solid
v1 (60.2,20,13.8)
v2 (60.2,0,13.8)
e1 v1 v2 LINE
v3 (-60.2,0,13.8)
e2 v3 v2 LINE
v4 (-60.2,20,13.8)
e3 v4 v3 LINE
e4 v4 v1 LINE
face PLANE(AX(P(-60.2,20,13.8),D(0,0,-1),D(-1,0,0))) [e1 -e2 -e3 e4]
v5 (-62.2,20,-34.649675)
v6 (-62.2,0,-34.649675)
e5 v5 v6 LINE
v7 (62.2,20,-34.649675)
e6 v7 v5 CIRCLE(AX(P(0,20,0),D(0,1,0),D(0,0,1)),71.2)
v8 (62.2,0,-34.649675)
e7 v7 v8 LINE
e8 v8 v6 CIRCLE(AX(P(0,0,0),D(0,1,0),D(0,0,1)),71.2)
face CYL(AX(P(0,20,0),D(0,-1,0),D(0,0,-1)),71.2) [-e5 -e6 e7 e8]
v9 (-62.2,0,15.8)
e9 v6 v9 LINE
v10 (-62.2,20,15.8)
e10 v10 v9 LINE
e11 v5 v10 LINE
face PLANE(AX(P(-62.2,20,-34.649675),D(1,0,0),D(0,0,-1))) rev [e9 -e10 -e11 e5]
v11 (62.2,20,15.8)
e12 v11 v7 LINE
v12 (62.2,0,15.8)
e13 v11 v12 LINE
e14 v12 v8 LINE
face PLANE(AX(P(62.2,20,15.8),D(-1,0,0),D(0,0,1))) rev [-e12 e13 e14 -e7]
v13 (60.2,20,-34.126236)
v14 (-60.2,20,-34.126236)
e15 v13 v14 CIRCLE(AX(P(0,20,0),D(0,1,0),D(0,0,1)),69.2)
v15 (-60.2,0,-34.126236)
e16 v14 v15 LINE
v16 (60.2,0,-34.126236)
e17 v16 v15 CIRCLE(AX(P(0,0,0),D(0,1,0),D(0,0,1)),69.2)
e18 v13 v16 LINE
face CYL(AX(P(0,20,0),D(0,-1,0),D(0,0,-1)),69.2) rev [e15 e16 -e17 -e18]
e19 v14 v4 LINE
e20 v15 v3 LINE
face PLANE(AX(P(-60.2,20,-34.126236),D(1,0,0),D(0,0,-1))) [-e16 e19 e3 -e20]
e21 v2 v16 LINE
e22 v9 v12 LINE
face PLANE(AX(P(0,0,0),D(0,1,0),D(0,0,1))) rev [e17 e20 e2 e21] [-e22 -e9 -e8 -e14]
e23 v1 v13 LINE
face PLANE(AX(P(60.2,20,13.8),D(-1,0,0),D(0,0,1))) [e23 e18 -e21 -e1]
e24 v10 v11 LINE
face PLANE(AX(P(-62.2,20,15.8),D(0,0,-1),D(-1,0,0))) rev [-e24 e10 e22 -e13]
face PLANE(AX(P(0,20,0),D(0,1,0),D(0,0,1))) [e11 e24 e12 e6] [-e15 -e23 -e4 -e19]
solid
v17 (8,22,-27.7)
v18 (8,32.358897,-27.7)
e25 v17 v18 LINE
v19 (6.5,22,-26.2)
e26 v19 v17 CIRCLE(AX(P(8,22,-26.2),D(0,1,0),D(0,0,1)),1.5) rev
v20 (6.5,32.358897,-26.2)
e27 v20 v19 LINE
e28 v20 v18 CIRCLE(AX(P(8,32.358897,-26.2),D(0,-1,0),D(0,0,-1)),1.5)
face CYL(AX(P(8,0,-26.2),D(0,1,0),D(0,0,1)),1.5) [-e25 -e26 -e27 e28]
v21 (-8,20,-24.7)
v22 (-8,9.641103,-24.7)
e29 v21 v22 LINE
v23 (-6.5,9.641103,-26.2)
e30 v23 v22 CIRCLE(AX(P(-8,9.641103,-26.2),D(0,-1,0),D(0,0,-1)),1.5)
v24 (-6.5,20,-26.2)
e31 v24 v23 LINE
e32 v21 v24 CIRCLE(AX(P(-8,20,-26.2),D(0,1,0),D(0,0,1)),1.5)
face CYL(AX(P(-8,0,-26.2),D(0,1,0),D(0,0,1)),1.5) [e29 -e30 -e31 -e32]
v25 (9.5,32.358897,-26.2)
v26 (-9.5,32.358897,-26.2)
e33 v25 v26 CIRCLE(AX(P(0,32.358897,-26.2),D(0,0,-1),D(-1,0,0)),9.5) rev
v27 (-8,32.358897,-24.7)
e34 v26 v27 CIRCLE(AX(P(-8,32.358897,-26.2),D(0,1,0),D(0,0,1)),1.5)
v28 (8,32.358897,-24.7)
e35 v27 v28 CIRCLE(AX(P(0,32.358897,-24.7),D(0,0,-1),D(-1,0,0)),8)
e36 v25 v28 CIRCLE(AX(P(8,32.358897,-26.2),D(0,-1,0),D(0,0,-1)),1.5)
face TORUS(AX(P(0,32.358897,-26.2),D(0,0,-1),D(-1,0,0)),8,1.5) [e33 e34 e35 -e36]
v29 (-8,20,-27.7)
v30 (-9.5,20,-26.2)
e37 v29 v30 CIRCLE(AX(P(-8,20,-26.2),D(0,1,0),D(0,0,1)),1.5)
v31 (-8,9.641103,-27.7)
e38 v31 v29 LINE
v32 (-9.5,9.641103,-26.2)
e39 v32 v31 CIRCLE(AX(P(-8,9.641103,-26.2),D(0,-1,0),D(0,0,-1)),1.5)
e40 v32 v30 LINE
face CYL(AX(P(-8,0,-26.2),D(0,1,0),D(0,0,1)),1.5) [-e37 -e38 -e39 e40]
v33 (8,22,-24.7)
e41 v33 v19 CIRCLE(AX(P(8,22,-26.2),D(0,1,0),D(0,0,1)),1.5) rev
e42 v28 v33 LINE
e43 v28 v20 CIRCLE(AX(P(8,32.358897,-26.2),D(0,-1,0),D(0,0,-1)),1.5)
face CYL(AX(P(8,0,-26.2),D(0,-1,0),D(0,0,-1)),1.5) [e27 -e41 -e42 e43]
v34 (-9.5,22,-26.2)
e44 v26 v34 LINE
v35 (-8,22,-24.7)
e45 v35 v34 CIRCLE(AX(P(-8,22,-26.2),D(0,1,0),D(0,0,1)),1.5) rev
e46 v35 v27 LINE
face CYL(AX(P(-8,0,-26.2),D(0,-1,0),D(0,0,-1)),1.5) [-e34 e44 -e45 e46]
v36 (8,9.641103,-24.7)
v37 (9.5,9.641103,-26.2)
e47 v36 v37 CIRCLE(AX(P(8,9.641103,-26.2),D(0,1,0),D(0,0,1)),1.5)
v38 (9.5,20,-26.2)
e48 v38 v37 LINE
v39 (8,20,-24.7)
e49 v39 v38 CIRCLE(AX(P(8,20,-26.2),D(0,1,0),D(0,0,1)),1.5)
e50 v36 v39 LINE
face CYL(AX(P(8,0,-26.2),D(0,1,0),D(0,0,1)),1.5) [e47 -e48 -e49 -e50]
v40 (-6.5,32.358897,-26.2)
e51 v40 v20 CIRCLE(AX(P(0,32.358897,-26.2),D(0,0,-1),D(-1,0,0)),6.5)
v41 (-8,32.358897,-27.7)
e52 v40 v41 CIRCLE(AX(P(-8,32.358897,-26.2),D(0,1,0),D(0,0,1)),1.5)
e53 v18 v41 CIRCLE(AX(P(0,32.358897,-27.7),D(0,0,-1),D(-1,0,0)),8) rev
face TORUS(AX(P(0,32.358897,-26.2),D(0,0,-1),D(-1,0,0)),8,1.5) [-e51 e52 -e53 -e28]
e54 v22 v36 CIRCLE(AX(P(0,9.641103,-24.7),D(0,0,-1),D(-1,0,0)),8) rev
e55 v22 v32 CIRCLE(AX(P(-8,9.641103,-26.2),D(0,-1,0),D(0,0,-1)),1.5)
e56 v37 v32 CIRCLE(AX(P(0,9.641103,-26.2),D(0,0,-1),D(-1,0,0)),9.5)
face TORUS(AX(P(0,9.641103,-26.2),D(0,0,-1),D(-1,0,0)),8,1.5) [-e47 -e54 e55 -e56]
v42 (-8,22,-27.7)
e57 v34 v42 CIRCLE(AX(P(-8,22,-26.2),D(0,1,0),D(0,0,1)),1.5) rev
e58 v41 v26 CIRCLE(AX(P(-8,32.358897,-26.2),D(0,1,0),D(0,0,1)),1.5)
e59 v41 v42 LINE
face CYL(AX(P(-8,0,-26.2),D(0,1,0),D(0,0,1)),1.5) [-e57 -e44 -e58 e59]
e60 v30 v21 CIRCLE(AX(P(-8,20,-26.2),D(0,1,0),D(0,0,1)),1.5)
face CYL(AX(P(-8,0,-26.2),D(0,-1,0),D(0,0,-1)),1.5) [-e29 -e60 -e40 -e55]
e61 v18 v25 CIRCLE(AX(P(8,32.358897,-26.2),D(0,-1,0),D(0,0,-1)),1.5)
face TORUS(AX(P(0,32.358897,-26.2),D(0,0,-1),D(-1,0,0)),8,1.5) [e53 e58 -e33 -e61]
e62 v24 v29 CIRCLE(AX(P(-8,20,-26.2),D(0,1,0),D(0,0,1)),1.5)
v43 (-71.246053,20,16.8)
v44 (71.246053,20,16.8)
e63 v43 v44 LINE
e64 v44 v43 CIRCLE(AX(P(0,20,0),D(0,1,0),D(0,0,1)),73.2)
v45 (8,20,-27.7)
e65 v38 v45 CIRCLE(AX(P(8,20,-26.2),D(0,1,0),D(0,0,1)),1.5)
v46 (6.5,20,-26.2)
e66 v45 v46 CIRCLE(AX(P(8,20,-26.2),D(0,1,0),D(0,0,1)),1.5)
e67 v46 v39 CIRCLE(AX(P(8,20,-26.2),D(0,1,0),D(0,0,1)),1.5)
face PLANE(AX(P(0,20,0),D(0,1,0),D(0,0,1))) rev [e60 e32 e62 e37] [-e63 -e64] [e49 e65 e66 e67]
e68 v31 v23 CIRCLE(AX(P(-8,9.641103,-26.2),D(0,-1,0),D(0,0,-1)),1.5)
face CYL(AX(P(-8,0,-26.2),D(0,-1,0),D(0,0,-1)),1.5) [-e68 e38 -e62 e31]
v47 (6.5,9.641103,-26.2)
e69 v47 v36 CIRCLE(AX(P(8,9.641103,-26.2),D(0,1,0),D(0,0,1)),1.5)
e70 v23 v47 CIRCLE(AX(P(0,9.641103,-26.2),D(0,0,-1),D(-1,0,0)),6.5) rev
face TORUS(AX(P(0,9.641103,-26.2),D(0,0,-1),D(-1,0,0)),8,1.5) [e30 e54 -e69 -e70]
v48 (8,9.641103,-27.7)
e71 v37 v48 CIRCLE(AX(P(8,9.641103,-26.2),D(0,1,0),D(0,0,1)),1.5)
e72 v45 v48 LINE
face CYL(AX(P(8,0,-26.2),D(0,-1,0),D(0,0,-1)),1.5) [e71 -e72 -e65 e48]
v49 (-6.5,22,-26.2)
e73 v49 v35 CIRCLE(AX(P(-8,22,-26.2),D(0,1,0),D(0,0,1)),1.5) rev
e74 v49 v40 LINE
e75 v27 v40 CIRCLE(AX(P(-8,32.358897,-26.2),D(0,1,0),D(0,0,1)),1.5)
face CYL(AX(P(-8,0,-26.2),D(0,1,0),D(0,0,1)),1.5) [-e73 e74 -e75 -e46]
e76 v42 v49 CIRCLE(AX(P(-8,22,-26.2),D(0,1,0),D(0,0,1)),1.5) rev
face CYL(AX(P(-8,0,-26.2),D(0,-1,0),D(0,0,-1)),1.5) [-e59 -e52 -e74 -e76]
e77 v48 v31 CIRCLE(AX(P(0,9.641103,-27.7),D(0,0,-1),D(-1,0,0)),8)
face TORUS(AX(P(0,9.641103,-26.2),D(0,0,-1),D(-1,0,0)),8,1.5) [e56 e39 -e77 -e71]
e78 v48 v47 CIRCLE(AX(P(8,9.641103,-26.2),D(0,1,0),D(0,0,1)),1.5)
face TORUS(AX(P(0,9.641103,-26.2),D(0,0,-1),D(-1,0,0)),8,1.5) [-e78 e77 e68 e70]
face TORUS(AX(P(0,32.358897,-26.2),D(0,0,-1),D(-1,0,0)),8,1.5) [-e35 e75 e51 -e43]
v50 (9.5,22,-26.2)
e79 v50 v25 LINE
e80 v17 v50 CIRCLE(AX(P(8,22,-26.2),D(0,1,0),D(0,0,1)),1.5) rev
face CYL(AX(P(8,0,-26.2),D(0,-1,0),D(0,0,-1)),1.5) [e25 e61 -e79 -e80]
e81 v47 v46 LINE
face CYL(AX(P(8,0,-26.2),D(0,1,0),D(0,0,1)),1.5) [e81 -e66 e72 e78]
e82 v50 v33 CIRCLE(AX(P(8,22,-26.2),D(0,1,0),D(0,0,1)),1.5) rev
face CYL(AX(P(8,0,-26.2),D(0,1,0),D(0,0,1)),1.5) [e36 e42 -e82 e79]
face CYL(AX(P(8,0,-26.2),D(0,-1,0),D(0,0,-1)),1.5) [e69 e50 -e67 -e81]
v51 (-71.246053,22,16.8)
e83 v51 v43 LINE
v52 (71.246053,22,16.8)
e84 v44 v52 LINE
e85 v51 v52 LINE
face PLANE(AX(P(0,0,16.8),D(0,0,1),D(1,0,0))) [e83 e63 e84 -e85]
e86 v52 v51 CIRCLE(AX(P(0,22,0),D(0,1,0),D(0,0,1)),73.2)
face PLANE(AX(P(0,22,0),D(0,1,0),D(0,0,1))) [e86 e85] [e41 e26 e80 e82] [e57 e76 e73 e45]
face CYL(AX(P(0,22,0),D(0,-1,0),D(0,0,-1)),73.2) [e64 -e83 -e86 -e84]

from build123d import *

# Parameters (mm, degrees)
BOSS_EXTRUDE1_DEPTH      = 20
BOSS_EXTRUDE1_2_DEPTH    = 20
SKETCH2_R                = 73.2
BOSS_EXTRUDE2_DEPTH      = 2
BODY_DELETE_KEEP_1_DEPTH = 22
BOSS_EXTRUDE3_DEPTH      = 1.5
BOSS_EXTRUDE3_DEPTH_BACK = 1.5
FILLET1_R                = 1.5


# Read off the part's stored shape, not the designer's step: Body-Delete/Keep 1
with BuildPart() as part:
    # Sketch1 → Boss-Extrude1 (new body)
    with BuildSketch(Plane(origin=(0, 0, 0), x_dir=(1, 0, 0), z_dir=(0, 1, 0))):
        with BuildLine():
            Line((62.2, -17.8), (-62.2, -17.8))
            Line((-62.2, -17.8), (-62.2, -34.649675323))
            ThreePointArc((-62.2, -34.649675323), (0, -71.2), (62.2, -34.649675323))
            Line((62.2, -34.649675323), (62.2, -17.8))
        make_face()
        with BuildLine():
            Line((60.2, -34.126236241), (60.2, -19.8))
            Line((60.2, -19.8), (-60.2, -19.8))
            Line((-60.2, -19.8), (-60.2, -34.126236241))
            ThreePointArc((-60.2, -34.126236241), (0, -69.2), (60.2, -34.126236241))
        make_face(mode=Mode.SUBTRACT)
    extrude(amount=BOSS_EXTRUDE1_DEPTH)


with BuildPart() as body_2:
    # Sketch1 → Boss-Extrude1 2 (new body)
    with BuildSketch(Plane(origin=(0, 0, 0), x_dir=(1, 0, 0), z_dir=(0, 1, 0))):
        with BuildLine():
            Line((-62.2, -15.8), (62.2, -15.8))
            Line((62.2, -15.8), (62.2, 34.649675323))
            ThreePointArc((62.2, 34.649675323), (0, 71.2), (-62.2, 34.649675323))
            Line((-62.2, 34.649675323), (-62.2, -15.8))
        make_face()
        with BuildLine():
            Line((-60.2, 34.126236241), (-60.2, -13.8))
            Line((-60.2, -13.8), (60.2, -13.8))
            Line((60.2, -13.8), (60.2, 34.126236241))
            ThreePointArc((60.2, 34.126236241), (0, 69.2), (-60.2, 34.126236241))
        make_face(mode=Mode.SUBTRACT)
    extrude(amount=BOSS_EXTRUDE1_2_DEPTH)


with BuildPart() as body_3:
    # Sketch2 → Boss-Extrude2 (new body)
    with BuildSketch(Plane(origin=(0, 20, 0), x_dir=(1, 0, 0), z_dir=(0, 1, 0))):
        with Locations(Location((0, 0, 0), (0, 0, 270))):
            Circle(SKETCH2_R)
    extrude(amount=BOSS_EXTRUDE2_DEPTH)


with BuildPart() as body_4:
    # Split1: the piece on the far side of the plane
    add(body_3.part)
    split(bisect_by=Plane.XY.offset(16.8), keep=Keep.BOTTOM)

    # Sketch3 → Boss-Extrude3 (add, two sides: drawn at the far end of the back side and taken through both)
    with BuildSketch(Plane(origin=(0, 0, -26.2), x_dir=(-1, 0, 0), z_dir=(0, 0, -1)).offset(-BOSS_EXTRUDE3_DEPTH_BACK)):
        with BuildLine():
            Line((9.5, 9.641102956), (9.5, 32.358897044))
            ThreePointArc((9.5, 32.358897044), (0, 41.858897044), (-9.5, 32.358897044))
            Line((-9.5, 32.358897044), (-9.5, 9.641102956))
            ThreePointArc((-9.5, 9.641102956), (0, 0.141102956), (9.5, 9.641102956))
        make_face()
        with BuildLine():
            ThreePointArc((6.5, 32.358897044), (0, 38.858897044), (-6.5, 32.358897044))
            Line((-6.5, 32.358897044), (-6.5, 9.641102956))
            ThreePointArc((-6.5, 9.641102956), (0, 3.141102956), (6.5, 9.641102956))
            Line((6.5, 9.641102956), (6.5, 32.358897044))
        make_face(mode=Mode.SUBTRACT)
    extrude(amount=BOSS_EXTRUDE3_DEPTH + BOSS_EXTRUDE3_DEPTH_BACK)

    # Fillet1
    fillet1_edges = [body_4.edges().sort_by_distance(p)[0] for p in [
        (6.5, 14.820551478, -27.7),
        (-9.5, 14.820551478, -27.7),
        (-6.5, 14.820551478, -27.7),
        (0, 3.141102956, -27.7),
        (0, 0.141102956, -27.7),
        (9.5, 14.820551478, -27.7),
        (6.5, 14.820551478, -24.7),
        (0, 3.141102956, -24.7),
        (-6.5, 14.820551478, -24.7),
        (-9.5, 14.820551478, -24.7),
        (0, 0.141102956, -24.7),
        (9.5, 14.820551478, -24.7),
        (9.5, 27.179448522, -24.7),
        (0, 41.858897044, -24.7),
        (-9.5, 27.179448522, -24.7),
        (-9.5, 27.179448522, -27.7),
        (9.5, 27.179448522, -27.7),
        (0, 41.858897044, -27.7),
        (6.5, 27.179448522, -27.7),
        (0, 38.858897044, -27.7),
        (-6.5, 27.179448522, -27.7),
        (-6.5, 27.179448522, -24.7),
        (6.5, 27.179448522, -24.7),
        (0, 38.858897044, -24.7),
    ]]
    fillet(fillet1_edges, radius=FILLET1_R - 0.0001)  # a hair under: the kernel refuses the full size


with BuildPart() as body_3_1:
    add(body_3.part)

    # Split1
    split(bisect_by=Plane.XY.offset(16.8), keep=Keep.TOP)


with BuildPart() as body_delete_keep_1_tool:
    # Body-Delete/Keep 1 outline → Body-Delete/Keep 1 (new body)
    with BuildSketch(Plane(origin=(0, 0, 0), x_dir=(1, 0, 0), z_dir=(0, 1, 0))):
        with BuildLine():
            ThreePointArc((-71.246052522, -16.8), (0, -73.2), (71.246052522, -16.8))
            Line((71.246052522, -16.8), (-71.246052522, -16.8))
        make_face()
    extrude(amount=BODY_DELETE_KEEP_1_DEPTH)


with BuildPart() as part_1:
    add(part.part)

    # Body-Delete/Keep 1: cut by body_delete_keep_1_tool
    add(body_delete_keep_1_tool.part, mode=Mode.SUBTRACT)


with BuildPart() as body_3_2:
    add(body_3_1.part)

    # Body-Delete/Keep 1: cut by body_delete_keep_1_tool
    add(body_delete_keep_1_tool.part, mode=Mode.SUBTRACT)


solid = Compound([body_2.part, body_4.part])
